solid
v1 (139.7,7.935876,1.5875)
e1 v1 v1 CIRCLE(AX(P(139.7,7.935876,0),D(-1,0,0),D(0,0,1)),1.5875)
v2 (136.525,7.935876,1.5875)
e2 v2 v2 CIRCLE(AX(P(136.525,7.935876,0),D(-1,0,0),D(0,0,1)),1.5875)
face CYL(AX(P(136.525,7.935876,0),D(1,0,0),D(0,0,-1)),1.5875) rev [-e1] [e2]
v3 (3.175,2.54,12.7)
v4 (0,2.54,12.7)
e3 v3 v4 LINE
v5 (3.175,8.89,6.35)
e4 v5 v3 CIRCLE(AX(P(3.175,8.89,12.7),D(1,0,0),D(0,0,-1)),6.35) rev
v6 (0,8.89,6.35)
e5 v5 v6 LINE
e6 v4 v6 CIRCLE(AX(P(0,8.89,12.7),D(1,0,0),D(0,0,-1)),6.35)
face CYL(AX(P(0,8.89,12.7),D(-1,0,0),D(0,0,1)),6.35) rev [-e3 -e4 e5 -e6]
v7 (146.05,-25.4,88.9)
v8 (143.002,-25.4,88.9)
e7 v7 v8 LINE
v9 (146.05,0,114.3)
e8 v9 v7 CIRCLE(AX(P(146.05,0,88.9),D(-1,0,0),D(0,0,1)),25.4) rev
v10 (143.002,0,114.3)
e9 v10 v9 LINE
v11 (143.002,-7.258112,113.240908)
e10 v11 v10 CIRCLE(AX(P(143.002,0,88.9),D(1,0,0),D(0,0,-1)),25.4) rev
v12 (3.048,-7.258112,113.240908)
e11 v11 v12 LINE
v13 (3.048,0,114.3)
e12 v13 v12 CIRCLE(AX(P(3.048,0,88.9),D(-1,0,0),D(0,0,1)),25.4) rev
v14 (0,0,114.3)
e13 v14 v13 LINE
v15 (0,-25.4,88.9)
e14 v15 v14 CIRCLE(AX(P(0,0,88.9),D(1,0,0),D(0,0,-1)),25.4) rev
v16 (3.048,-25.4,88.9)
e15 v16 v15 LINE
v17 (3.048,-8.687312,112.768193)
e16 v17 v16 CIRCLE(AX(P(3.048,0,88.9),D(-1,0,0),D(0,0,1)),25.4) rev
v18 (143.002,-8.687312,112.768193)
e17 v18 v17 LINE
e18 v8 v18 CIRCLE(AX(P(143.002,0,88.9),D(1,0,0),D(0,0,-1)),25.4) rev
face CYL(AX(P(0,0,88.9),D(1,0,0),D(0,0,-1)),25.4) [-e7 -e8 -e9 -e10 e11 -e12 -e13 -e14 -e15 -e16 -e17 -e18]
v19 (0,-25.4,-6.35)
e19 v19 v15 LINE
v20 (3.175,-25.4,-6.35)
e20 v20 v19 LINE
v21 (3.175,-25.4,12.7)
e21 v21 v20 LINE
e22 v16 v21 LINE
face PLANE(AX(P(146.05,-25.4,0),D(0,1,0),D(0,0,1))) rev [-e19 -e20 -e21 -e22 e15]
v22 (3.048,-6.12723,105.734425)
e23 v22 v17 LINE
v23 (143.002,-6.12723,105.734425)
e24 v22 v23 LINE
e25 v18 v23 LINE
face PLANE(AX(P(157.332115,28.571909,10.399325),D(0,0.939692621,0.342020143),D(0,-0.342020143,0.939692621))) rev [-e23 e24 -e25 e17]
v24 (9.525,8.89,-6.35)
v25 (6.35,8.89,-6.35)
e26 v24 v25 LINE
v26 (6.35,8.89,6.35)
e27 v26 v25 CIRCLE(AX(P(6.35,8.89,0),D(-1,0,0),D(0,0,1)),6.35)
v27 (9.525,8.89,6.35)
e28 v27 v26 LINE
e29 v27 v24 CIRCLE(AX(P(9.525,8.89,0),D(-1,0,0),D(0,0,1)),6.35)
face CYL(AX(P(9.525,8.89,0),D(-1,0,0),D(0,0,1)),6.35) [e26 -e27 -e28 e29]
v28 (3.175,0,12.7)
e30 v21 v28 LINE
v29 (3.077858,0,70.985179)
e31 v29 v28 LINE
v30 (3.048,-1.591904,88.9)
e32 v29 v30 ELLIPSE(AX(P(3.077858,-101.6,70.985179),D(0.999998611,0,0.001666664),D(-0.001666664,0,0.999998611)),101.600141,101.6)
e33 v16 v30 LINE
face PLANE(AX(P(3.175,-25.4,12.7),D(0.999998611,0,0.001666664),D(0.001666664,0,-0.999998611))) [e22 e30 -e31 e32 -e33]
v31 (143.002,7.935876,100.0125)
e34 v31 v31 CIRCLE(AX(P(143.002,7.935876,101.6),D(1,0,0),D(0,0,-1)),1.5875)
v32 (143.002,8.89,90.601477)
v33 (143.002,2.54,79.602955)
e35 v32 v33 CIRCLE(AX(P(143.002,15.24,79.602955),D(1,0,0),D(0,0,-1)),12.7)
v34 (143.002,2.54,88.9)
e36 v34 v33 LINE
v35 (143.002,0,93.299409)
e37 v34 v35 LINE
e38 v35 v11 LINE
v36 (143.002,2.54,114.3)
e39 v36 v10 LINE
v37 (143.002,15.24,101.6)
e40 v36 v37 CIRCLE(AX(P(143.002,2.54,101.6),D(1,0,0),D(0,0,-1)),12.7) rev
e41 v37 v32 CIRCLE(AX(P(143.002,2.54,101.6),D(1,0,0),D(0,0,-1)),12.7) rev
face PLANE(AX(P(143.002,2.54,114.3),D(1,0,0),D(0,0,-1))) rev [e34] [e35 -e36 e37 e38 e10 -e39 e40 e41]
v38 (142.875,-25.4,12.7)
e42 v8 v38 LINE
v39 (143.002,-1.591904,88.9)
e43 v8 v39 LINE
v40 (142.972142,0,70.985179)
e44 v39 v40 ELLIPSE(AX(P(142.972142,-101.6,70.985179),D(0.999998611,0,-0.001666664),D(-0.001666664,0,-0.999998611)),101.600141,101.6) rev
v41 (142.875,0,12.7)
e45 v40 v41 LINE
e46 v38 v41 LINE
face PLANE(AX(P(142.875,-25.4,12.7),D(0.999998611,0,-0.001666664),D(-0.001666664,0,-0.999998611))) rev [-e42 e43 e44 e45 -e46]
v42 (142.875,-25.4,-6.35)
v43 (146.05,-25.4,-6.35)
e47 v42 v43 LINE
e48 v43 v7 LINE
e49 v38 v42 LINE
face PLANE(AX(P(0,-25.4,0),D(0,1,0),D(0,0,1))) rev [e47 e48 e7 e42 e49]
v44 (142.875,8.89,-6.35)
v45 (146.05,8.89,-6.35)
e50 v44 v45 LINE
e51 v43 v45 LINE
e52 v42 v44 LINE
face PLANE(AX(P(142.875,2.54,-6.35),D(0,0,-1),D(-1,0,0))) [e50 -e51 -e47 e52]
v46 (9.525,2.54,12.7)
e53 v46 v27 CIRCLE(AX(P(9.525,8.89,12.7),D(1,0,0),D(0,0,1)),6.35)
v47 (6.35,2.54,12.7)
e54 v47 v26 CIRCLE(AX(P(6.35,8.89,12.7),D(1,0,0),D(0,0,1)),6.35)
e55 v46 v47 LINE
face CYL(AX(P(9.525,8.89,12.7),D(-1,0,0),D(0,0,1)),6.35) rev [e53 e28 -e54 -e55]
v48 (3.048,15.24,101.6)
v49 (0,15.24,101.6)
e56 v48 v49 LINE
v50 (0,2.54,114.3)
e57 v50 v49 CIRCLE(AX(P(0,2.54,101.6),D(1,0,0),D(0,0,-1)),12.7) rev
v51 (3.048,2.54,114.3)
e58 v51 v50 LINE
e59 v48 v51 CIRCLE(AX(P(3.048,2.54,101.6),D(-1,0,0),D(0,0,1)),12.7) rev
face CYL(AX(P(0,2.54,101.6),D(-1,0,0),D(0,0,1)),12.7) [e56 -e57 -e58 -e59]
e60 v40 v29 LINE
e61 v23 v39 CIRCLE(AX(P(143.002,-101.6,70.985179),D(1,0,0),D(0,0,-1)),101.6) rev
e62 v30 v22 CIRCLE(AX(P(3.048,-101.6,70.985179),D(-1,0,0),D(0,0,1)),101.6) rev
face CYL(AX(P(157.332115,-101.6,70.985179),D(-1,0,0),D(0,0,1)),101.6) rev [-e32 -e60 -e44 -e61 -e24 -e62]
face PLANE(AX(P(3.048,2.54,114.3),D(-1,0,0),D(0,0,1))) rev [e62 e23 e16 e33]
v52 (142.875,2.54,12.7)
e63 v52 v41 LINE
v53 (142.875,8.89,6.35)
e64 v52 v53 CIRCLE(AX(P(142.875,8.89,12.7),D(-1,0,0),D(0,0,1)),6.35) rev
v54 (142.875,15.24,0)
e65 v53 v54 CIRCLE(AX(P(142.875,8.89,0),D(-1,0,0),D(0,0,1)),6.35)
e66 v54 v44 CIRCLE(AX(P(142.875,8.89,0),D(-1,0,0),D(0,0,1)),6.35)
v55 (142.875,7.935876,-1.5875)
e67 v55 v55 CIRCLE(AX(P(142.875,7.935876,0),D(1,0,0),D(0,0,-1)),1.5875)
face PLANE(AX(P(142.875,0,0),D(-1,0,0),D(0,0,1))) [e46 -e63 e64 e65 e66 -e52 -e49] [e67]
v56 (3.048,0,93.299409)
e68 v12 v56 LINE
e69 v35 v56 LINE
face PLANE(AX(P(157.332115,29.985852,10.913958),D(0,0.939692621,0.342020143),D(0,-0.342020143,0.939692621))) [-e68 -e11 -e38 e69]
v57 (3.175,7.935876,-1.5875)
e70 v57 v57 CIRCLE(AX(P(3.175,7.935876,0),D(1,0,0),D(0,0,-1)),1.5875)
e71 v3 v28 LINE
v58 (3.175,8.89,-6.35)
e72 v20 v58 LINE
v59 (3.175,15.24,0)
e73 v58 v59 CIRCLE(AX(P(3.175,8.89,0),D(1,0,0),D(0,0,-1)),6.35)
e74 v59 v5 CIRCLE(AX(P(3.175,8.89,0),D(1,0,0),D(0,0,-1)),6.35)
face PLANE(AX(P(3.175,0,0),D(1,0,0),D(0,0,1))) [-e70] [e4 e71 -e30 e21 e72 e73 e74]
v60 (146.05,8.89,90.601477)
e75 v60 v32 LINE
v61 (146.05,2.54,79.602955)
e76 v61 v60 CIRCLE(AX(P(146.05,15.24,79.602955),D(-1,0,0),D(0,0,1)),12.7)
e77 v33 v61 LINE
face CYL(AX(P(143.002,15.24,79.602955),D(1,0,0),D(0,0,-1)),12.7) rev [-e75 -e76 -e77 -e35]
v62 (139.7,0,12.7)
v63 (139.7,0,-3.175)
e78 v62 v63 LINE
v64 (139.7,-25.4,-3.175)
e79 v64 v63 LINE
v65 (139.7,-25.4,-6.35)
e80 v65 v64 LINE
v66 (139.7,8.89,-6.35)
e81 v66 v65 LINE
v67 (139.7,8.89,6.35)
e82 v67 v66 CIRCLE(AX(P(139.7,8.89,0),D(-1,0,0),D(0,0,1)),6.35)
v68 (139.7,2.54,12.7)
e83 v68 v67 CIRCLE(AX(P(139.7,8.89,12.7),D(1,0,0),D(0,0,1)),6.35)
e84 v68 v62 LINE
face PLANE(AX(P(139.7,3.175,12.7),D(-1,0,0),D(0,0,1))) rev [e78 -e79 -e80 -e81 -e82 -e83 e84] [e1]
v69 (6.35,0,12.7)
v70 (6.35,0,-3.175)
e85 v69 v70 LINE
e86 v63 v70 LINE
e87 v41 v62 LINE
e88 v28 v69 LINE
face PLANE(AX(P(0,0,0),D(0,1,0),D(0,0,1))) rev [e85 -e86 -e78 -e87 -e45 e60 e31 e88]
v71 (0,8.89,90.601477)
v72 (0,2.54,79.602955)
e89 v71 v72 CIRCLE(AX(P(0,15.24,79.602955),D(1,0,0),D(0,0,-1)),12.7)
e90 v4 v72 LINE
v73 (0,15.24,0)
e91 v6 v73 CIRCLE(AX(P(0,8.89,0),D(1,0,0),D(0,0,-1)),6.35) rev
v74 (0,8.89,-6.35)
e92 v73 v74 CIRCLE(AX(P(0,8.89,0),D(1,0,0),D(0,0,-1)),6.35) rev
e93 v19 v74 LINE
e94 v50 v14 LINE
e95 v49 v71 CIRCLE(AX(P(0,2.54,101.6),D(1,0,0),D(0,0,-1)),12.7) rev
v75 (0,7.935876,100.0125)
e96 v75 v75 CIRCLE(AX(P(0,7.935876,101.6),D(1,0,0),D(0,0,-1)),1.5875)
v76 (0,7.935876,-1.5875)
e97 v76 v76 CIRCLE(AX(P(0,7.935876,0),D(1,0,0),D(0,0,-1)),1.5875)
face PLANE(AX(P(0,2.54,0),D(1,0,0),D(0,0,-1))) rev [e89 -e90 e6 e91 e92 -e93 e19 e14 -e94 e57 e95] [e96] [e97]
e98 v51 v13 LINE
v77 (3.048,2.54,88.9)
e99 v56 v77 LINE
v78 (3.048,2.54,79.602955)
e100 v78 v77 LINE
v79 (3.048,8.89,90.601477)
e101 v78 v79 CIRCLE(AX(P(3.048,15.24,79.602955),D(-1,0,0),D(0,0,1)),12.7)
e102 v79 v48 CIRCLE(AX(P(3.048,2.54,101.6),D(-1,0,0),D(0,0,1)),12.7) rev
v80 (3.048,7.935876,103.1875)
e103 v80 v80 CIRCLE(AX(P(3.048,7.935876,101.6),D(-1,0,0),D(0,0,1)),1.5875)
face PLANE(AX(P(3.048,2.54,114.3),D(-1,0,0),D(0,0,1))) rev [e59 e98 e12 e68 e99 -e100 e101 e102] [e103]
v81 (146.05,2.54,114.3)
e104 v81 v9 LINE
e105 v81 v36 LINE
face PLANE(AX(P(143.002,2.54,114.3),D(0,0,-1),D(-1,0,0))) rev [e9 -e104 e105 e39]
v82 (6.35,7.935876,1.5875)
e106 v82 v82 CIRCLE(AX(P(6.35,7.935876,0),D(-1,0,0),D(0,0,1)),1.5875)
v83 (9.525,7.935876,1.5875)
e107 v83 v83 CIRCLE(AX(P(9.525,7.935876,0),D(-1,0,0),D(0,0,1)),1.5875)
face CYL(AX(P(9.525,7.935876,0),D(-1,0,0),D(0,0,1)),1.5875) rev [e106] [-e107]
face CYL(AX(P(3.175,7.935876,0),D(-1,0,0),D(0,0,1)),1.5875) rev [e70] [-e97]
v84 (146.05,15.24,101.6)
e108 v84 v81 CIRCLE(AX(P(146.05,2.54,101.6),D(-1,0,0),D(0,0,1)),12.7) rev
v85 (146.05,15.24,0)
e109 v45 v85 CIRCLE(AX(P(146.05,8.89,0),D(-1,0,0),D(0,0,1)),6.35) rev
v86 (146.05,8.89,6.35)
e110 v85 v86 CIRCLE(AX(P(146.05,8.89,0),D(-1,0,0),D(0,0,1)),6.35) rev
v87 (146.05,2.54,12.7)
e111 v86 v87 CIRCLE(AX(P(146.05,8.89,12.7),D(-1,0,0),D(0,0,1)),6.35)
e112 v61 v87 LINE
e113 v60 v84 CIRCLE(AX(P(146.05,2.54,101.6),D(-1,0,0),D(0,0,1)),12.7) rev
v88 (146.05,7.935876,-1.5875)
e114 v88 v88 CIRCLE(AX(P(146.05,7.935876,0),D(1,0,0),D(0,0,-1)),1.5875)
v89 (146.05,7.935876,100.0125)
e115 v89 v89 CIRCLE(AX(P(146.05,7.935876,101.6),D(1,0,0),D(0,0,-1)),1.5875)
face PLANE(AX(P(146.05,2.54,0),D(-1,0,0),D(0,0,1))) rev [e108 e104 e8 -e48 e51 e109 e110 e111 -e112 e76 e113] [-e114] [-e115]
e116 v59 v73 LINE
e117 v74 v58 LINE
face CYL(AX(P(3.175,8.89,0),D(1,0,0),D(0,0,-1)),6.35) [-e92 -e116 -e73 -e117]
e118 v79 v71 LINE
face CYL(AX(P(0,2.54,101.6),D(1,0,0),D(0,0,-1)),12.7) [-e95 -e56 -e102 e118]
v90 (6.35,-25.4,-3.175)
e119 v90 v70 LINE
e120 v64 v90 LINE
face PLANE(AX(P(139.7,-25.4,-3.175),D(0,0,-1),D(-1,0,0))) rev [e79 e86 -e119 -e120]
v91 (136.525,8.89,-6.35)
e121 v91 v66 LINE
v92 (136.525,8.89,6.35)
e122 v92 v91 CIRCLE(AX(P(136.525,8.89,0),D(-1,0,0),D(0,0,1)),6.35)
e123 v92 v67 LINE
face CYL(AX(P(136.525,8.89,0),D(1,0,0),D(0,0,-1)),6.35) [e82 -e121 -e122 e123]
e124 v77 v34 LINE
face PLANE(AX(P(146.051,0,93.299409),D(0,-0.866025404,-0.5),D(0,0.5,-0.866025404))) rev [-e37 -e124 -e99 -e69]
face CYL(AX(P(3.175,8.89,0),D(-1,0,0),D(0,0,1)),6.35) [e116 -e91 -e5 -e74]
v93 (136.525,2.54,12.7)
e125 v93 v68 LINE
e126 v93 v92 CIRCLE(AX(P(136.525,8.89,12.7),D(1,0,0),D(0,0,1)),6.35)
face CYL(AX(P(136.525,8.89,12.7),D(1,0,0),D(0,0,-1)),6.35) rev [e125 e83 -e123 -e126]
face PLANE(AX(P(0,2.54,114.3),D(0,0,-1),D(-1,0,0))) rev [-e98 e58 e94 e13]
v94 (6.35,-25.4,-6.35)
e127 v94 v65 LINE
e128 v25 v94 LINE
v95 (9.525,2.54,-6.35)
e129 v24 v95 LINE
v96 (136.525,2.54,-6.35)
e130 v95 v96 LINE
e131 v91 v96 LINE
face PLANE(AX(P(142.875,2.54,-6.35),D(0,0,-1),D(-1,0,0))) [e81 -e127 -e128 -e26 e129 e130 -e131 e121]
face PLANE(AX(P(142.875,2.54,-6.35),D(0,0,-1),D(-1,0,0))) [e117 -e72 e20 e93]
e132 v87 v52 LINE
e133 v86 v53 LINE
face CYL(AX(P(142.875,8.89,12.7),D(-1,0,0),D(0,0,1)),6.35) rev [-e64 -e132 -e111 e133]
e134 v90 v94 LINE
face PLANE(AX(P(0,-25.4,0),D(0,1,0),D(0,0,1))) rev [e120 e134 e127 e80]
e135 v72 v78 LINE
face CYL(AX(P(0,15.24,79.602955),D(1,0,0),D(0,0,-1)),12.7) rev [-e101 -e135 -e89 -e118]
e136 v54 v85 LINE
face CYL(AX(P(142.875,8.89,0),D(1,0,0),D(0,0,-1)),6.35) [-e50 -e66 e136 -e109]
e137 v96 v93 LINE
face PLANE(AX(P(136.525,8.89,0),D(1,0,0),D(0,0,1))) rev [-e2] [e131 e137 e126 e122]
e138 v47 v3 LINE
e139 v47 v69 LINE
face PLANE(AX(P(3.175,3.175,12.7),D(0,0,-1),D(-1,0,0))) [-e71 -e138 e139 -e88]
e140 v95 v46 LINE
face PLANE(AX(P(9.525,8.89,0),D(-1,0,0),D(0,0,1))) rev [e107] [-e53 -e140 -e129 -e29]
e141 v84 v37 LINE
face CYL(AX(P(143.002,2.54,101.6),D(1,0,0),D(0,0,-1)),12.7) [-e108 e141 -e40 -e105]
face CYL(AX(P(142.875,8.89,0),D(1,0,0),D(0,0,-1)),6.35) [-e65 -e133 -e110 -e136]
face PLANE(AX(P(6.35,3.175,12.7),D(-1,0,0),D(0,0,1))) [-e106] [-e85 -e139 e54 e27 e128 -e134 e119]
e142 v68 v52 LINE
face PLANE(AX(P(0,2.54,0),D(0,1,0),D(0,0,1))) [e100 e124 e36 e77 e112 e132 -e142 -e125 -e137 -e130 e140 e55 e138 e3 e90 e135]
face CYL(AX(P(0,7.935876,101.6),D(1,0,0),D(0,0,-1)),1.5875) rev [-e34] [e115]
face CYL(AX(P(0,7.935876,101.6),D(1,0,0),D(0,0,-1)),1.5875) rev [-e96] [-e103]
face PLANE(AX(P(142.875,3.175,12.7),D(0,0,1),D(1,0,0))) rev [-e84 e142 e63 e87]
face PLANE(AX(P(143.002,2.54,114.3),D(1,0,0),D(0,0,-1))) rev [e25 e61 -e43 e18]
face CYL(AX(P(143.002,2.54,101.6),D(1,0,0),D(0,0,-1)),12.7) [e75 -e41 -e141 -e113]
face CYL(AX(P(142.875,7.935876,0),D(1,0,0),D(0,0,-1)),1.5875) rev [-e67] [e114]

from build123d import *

# Parameters (mm, degrees)
BOSS_EXTRUDE1_DEPTH  = 2.54
SKETCH2_W            = 3.048
SKETCH2_H            = 25.4
BOSS_EXTRUDE2_DEPTH  = 12.7
FILLET5_R            = 12.7
FILLET6_R            = 12.7
FILLET7_R            = 12.7
FILLET8_R            = 12.7
SKETCH3_R            = 1.5875
CUT_EXTRUDE1_DEPTH   = 187.084255379
SKETCH4_W            = 12.7
SKETCH4_H            = 12.7
SKETCH4_R            = 1.5875
BOSS_EXTRUDE3_DEPTH  = 3.175
BOSS_EXTRUDE4_DEPTH  = 6.35
FILLET10_R           = 6.35
FILLET11_R           = 6.35
SKETCH6_W            = 3.175
SKETCH6_H            = 19.05
CUT_EXTRUDE2_DEPTH   = 3.175
BOSS_EXTRUDE5_DEPTH  = 25.4
FILLET12_R           = 25.4
SKETCH8_W            = 133.35
SKETCH8_H            = 3.175
BOSS_EXTRUDE6_DEPTH  = 25.4
BOSS_EXTRUDE9_DEPTH  = 114.554
CUT_EXTRUDE3_REACH   = 177.181
BOSS_EXTRUDE10_DEPTH = 12.7
BOSS_EXTRUDE11_DEPTH = 12.7
CUT_EXTRUDE4_DEPTH   = 185.822136131
FILLET15_R           = 101.6
SKETCH14_R           = 1.5875
BOSS_EXTRUDE12_DEPTH = 3.175


# Some blends are built 0.0001 mm under size
with BuildPart() as part:
    # Sketch1 → Boss-Extrude1 (new body)
    with BuildSketch(Plane(origin=(0, 0, 0), x_dir=(1, 0, 0), z_dir=(0, 1, 0))):
        Polygon((15.748, -114.3), (130.302, -114.3), (130.302, -88.9), (143.002, -88.9), (143.002, -114.3), (146.05, -114.3), (146.05, 0), (0, 0), (0, -114.3), (3.048, -114.3), (3.048, -88.9), (15.748, -88.9), align=None)
    extrude(amount=BOSS_EXTRUDE1_DEPTH)

    # Sketch2 → Boss-Extrude2 (add)
    with BuildSketch(Plane(origin=(0, 2.54, 0), x_dir=(1, 0, 0), z_dir=(0, 1, 0))):
        with Locations((1.524, -101.6)):
            Rectangle(SKETCH2_W, SKETCH2_H)
    boss_extrude2 = extrude(amount=BOSS_EXTRUDE2_DEPTH)

    # Mirror1: Boss-Extrude2 across plane
    add(boss_extrude2.mirror(Plane(origin=(73.025, 0, 0), x_dir=(0, 0, 1), z_dir=(1, 0, 0))))

    # Fillet5
    fillet5_edges = [part.edges().sort_by_distance(p)[0] for p in [
        (1.524, 15.24, 114.3),
        (1.524, 15.24, 88.9),
    ]]
    fillet(fillet5_edges, radius=FILLET5_R - 0.0001)  # a hair under: the kernel refuses the full size

    # Fillet6
    # the kernel refuses this fillet: 12.7 mm, written as the material it adds along each edge
    with BuildSketch(Plane(origin=(3.048, 2.54, 88.9), x_dir=(0, 0.9659271393953295, 0.25881414447351125), z_dir=(-1, 0, 0))) as fillet6_piece_1:
        with BuildLine():
            CenterArc((9.861056917, 12.267248789), FILLET6_R, 194.99970931, 60.000130236)
            Line((-2.406217753, 8.980309154), (-3.63294522, 8.65161519))
            Line((-3.63294522, 8.65161519), (-1.226727467, -0.328693963))
            Line((-1.226727467, -0.328693963), (0.328693963, -1.226727467))
            ThreePointArc((0.328693963, -1.226727467), (0.328790556, -1.226701586), (6.245317068, -1.226724879))
            Line((6.245317068, -1.226724879), (6.574020691, 0))
        make_face()
    extrude(amount=3.048)

    # Fillet7
    fillet7_edges = [part.edges().sort_by_distance(p)[0] for p in [
        (144.526, 15.24, 88.9),
        (144.526, 15.24, 114.3),
    ]]
    fillet(fillet7_edges, radius=FILLET7_R - 0.0001)  # a hair under: the kernel refuses the full size

    # Fillet8
    # the kernel refuses this fillet: 12.7 mm, written as the material it adds along each edge
    with BuildSketch(Plane(origin=(143.002, 2.54, 88.9), x_dir=(0, 0, -1), z_dir=(1, 0, 0))) as fillet8_piece_1:
        with BuildLine():
            CenterArc((9.297087521, 12.7), FILLET8_R, 209.999869764, 60.000130236)
            Line((-1.701449541, 6.350025), (-2.801303247, 5.7150275))
            ThreePointArc((-2.801303247, 5.7150275), (-1.27, 0.0001), (-1.27, 0))
            Line((-1.27, 0), (0, -1.27))
            Line((0, -1.27), (9.297087521, -1.27))
            Line((9.297087521, -1.27), (9.297087521, 0))
        make_face()
    extrude(amount=3.048)

    # Sketch3 → Cut-Extrude1 (cut, through all)
    with BuildSketch(Plane(origin=(146.05, 0, 0), x_dir=(0, 0, -1), z_dir=(1, 0, 0))):
        with Locations((-101.6, 7.935875783)):
            Circle(SKETCH3_R)
    extrude(amount=-CUT_EXTRUDE1_DEPTH, mode=Mode.SUBTRACT)

    # Sketch4 → Boss-Extrude3 (add)
    with BuildSketch(Plane(origin=(146.05, 0, 0), x_dir=(0, 0, -1), z_dir=(1, 0, 0))):
        with Locations((0, 8.89)):
            Rectangle(SKETCH4_W, SKETCH4_H)
        with Locations((0, 7.935875783)):
            Circle(SKETCH4_R, mode=Mode.SUBTRACT)
    boss_extrude3 = extrude(amount=-BOSS_EXTRUDE3_DEPTH)

    # Sketch5 → Boss-Extrude4 (add)
    with BuildSketch(Plane(origin=(0, 0, 0), x_dir=(-1, 0, 0), z_dir=(0, 0, -1))):
        Polygon((-146.05, 0), (0, 0), (0, 2.54), (-142.875, 2.54), (-146.05, 2.54), align=None)
    extrude(amount=BOSS_EXTRUDE4_DEPTH)

    # Mirror2: Boss-Extrude3 across plane
    add(boss_extrude3.mirror(Plane(origin=(73.025, 0, 0), x_dir=(0, 0, 1), z_dir=(1, 0, 0))))

    # Fillet10
    fillet10_edges = [part.edges().sort_by_distance(p)[0] for p in [
        (1.5875, 15.24, 6.35),
        (1.5875, 15.24, -6.35),
        (144.4625, 15.24, -6.35),
        (144.4625, 15.24, 6.35),
    ]]
    fillet(fillet10_edges, radius=FILLET10_R - 0.0001)  # a hair under: the kernel refuses the full size

    # Fillet11
    fillet11_edges = [part.edges().sort_by_distance(p)[0] for p in [
        (1.5875, 2.54, 6.35),
        (144.4625, 2.54, 6.35),
    ]]
    fillet(fillet11_edges, radius=FILLET11_R)

    # Sketch6 → Cut-Extrude2 (cut)
    with BuildSketch(Plane.XZ):
        with Locations((141.2875, 3.175)):
            Rectangle(SKETCH6_W, SKETCH6_H)
    cut_extrude2 = extrude(amount=-CUT_EXTRUDE2_DEPTH, mode=Mode.SUBTRACT)

    # Mirror3: Cut-Extrude2 across plane
    add(cut_extrude2.mirror(Plane(origin=(73.025, 0, 0), x_dir=(0, 0, 1), z_dir=(1, 0, 0))), mode=Mode.SUBTRACT)

    # Sketch7 → Boss-Extrude5 (add)
    with BuildSketch(Plane.XZ):
        Polygon((143.002, 114.3), (146.05, 114.3), (146.05, -6.35), (142.875, -6.35), (142.875, 12.7), (143.002, 88.9), align=None)
    boss_extrude5 = extrude(amount=BOSS_EXTRUDE5_DEPTH)

    # Mirror4: Boss-Extrude5 across plane
    add(boss_extrude5.mirror(Plane(origin=(73.025, 0, 0), x_dir=(0, 0, 1), z_dir=(1, 0, 0))))

    # Fillet12
    fillet12_edges = [part.edges().sort_by_distance(p)[0] for p in [
        (1.524, -25.4, 114.3),
        (144.526, -25.4, 114.3),
    ]]
    fillet(fillet12_edges, radius=FILLET12_R)

    # Sketch8 → Boss-Extrude6 (add)
    with BuildSketch(Plane.XZ):
        with Locations((73.025, -4.7625)):
            Rectangle(SKETCH8_W, SKETCH8_H)
    extrude(amount=BOSS_EXTRUDE6_DEPTH)

    # Sketch9 → Boss-Extrude9 (add)
    with BuildSketch(Plane.ZY.offset(-15.748)):
        Polygon((114.3, -9.24484395), (114.3, -7.643590007), (93.299409051, 0), (88.9, 0), align=None)
    extrude(amount=-BOSS_EXTRUDE9_DEPTH)

    # Sketch10 → Cut-Extrude3 (cut, up to next)
    with BuildSketch(Plane.ZY.offset(-15.748), mode=Mode.PRIVATE) as cut_extrude3_sk1:
        Polygon((93.299409051, 0), (88.9, 2.54), (114.3, 2.54), (114.3, 0), align=None)
    cut_extrude3_tool1 = extrude(cut_extrude3_sk1.sketch, amount=-CUT_EXTRUDE3_REACH, mode=Mode.PRIVATE) & part.part
    add(cut_extrude3_tool1.solids().sort_by_distance((15.748, 1.310138, 102.665092))[0], mode=Mode.SUBTRACT)

    # Sketch11 → Boss-Extrude10 (add)
    with BuildSketch(Plane.ZY.offset(-15.748)):
        Polygon((114.3, -7.643590007), (93.299409051, 0), (88.9, 2.54), (88.9, 0), (114.3, -9.24484395), align=None)
    extrude(amount=BOSS_EXTRUDE10_DEPTH)

    # Sketch12 → Boss-Extrude11 (add)
    with BuildSketch(Plane(origin=(130.302, 0, 0), x_dir=(0, 0, -1), z_dir=(1, 0, 0))):
        Polygon((-88.9, 0), (-88.9, 2.54), (-93.299409051, 0), (-114.3, -7.643590007), (-114.3, -9.24484395), align=None)
    extrude(amount=BOSS_EXTRUDE11_DEPTH)

    # Sketch13 → Cut-Extrude4 (cut, through all)
    with BuildSketch(Plane.ZY.offset(-3.048)):
        with BuildLine():
            Line((114.3, -7.643590007), (113.240908135, -7.258112093))
            ThreePointArc((113.240908135, -7.258112093), (113.015140482, -7.976214611), (112.768192568, -8.68731164))
            Line((112.768192568, -8.68731164), (114.3, -9.24484395))
            Line((114.3, -9.24484395), (114.3, -7.643590007))
        make_face()
    extrude(amount=-CUT_EXTRUDE4_DEPTH, mode=Mode.SUBTRACT)

    # Fillet15
    fillet15_edges = [part.edges().sort_by_distance(p)[0] for p in [
        (73.025, 0, 88.9),
    ]]
    fillet(fillet15_edges, radius=FILLET15_R)

    # Sketch14 → Boss-Extrude12 (add)
    with BuildSketch(Plane.ZY.offset(-6.35)):
        with BuildLine():
            Line((-6.35, 2.54), (12.7, 2.54))
            ThreePointArc((12.7, 2.54), (8.209871939, 4.399871939), (6.35, 8.89))
            ThreePointArc((6.35, 8.89), (4.490128061, 13.380128061), (0, 15.24))
            ThreePointArc((0, 15.24), (-4.490128061, 13.380128061), (-6.35, 8.89))
            Line((-6.35, 8.89), (-6.35, 2.54))
        make_face()
        with Locations(Location((0, 7.935875783, 0), (0, 0, 180))):
            Circle(SKETCH14_R, mode=Mode.SUBTRACT)
    boss_extrude12 = extrude(amount=-BOSS_EXTRUDE12_DEPTH)

    # Mirror5: Boss-Extrude12 across plane
    add(boss_extrude12.mirror(Plane(origin=(73.025, 0, 0), x_dir=(0, 0, 1), z_dir=(1, 0, 0))))


solid = part.part
